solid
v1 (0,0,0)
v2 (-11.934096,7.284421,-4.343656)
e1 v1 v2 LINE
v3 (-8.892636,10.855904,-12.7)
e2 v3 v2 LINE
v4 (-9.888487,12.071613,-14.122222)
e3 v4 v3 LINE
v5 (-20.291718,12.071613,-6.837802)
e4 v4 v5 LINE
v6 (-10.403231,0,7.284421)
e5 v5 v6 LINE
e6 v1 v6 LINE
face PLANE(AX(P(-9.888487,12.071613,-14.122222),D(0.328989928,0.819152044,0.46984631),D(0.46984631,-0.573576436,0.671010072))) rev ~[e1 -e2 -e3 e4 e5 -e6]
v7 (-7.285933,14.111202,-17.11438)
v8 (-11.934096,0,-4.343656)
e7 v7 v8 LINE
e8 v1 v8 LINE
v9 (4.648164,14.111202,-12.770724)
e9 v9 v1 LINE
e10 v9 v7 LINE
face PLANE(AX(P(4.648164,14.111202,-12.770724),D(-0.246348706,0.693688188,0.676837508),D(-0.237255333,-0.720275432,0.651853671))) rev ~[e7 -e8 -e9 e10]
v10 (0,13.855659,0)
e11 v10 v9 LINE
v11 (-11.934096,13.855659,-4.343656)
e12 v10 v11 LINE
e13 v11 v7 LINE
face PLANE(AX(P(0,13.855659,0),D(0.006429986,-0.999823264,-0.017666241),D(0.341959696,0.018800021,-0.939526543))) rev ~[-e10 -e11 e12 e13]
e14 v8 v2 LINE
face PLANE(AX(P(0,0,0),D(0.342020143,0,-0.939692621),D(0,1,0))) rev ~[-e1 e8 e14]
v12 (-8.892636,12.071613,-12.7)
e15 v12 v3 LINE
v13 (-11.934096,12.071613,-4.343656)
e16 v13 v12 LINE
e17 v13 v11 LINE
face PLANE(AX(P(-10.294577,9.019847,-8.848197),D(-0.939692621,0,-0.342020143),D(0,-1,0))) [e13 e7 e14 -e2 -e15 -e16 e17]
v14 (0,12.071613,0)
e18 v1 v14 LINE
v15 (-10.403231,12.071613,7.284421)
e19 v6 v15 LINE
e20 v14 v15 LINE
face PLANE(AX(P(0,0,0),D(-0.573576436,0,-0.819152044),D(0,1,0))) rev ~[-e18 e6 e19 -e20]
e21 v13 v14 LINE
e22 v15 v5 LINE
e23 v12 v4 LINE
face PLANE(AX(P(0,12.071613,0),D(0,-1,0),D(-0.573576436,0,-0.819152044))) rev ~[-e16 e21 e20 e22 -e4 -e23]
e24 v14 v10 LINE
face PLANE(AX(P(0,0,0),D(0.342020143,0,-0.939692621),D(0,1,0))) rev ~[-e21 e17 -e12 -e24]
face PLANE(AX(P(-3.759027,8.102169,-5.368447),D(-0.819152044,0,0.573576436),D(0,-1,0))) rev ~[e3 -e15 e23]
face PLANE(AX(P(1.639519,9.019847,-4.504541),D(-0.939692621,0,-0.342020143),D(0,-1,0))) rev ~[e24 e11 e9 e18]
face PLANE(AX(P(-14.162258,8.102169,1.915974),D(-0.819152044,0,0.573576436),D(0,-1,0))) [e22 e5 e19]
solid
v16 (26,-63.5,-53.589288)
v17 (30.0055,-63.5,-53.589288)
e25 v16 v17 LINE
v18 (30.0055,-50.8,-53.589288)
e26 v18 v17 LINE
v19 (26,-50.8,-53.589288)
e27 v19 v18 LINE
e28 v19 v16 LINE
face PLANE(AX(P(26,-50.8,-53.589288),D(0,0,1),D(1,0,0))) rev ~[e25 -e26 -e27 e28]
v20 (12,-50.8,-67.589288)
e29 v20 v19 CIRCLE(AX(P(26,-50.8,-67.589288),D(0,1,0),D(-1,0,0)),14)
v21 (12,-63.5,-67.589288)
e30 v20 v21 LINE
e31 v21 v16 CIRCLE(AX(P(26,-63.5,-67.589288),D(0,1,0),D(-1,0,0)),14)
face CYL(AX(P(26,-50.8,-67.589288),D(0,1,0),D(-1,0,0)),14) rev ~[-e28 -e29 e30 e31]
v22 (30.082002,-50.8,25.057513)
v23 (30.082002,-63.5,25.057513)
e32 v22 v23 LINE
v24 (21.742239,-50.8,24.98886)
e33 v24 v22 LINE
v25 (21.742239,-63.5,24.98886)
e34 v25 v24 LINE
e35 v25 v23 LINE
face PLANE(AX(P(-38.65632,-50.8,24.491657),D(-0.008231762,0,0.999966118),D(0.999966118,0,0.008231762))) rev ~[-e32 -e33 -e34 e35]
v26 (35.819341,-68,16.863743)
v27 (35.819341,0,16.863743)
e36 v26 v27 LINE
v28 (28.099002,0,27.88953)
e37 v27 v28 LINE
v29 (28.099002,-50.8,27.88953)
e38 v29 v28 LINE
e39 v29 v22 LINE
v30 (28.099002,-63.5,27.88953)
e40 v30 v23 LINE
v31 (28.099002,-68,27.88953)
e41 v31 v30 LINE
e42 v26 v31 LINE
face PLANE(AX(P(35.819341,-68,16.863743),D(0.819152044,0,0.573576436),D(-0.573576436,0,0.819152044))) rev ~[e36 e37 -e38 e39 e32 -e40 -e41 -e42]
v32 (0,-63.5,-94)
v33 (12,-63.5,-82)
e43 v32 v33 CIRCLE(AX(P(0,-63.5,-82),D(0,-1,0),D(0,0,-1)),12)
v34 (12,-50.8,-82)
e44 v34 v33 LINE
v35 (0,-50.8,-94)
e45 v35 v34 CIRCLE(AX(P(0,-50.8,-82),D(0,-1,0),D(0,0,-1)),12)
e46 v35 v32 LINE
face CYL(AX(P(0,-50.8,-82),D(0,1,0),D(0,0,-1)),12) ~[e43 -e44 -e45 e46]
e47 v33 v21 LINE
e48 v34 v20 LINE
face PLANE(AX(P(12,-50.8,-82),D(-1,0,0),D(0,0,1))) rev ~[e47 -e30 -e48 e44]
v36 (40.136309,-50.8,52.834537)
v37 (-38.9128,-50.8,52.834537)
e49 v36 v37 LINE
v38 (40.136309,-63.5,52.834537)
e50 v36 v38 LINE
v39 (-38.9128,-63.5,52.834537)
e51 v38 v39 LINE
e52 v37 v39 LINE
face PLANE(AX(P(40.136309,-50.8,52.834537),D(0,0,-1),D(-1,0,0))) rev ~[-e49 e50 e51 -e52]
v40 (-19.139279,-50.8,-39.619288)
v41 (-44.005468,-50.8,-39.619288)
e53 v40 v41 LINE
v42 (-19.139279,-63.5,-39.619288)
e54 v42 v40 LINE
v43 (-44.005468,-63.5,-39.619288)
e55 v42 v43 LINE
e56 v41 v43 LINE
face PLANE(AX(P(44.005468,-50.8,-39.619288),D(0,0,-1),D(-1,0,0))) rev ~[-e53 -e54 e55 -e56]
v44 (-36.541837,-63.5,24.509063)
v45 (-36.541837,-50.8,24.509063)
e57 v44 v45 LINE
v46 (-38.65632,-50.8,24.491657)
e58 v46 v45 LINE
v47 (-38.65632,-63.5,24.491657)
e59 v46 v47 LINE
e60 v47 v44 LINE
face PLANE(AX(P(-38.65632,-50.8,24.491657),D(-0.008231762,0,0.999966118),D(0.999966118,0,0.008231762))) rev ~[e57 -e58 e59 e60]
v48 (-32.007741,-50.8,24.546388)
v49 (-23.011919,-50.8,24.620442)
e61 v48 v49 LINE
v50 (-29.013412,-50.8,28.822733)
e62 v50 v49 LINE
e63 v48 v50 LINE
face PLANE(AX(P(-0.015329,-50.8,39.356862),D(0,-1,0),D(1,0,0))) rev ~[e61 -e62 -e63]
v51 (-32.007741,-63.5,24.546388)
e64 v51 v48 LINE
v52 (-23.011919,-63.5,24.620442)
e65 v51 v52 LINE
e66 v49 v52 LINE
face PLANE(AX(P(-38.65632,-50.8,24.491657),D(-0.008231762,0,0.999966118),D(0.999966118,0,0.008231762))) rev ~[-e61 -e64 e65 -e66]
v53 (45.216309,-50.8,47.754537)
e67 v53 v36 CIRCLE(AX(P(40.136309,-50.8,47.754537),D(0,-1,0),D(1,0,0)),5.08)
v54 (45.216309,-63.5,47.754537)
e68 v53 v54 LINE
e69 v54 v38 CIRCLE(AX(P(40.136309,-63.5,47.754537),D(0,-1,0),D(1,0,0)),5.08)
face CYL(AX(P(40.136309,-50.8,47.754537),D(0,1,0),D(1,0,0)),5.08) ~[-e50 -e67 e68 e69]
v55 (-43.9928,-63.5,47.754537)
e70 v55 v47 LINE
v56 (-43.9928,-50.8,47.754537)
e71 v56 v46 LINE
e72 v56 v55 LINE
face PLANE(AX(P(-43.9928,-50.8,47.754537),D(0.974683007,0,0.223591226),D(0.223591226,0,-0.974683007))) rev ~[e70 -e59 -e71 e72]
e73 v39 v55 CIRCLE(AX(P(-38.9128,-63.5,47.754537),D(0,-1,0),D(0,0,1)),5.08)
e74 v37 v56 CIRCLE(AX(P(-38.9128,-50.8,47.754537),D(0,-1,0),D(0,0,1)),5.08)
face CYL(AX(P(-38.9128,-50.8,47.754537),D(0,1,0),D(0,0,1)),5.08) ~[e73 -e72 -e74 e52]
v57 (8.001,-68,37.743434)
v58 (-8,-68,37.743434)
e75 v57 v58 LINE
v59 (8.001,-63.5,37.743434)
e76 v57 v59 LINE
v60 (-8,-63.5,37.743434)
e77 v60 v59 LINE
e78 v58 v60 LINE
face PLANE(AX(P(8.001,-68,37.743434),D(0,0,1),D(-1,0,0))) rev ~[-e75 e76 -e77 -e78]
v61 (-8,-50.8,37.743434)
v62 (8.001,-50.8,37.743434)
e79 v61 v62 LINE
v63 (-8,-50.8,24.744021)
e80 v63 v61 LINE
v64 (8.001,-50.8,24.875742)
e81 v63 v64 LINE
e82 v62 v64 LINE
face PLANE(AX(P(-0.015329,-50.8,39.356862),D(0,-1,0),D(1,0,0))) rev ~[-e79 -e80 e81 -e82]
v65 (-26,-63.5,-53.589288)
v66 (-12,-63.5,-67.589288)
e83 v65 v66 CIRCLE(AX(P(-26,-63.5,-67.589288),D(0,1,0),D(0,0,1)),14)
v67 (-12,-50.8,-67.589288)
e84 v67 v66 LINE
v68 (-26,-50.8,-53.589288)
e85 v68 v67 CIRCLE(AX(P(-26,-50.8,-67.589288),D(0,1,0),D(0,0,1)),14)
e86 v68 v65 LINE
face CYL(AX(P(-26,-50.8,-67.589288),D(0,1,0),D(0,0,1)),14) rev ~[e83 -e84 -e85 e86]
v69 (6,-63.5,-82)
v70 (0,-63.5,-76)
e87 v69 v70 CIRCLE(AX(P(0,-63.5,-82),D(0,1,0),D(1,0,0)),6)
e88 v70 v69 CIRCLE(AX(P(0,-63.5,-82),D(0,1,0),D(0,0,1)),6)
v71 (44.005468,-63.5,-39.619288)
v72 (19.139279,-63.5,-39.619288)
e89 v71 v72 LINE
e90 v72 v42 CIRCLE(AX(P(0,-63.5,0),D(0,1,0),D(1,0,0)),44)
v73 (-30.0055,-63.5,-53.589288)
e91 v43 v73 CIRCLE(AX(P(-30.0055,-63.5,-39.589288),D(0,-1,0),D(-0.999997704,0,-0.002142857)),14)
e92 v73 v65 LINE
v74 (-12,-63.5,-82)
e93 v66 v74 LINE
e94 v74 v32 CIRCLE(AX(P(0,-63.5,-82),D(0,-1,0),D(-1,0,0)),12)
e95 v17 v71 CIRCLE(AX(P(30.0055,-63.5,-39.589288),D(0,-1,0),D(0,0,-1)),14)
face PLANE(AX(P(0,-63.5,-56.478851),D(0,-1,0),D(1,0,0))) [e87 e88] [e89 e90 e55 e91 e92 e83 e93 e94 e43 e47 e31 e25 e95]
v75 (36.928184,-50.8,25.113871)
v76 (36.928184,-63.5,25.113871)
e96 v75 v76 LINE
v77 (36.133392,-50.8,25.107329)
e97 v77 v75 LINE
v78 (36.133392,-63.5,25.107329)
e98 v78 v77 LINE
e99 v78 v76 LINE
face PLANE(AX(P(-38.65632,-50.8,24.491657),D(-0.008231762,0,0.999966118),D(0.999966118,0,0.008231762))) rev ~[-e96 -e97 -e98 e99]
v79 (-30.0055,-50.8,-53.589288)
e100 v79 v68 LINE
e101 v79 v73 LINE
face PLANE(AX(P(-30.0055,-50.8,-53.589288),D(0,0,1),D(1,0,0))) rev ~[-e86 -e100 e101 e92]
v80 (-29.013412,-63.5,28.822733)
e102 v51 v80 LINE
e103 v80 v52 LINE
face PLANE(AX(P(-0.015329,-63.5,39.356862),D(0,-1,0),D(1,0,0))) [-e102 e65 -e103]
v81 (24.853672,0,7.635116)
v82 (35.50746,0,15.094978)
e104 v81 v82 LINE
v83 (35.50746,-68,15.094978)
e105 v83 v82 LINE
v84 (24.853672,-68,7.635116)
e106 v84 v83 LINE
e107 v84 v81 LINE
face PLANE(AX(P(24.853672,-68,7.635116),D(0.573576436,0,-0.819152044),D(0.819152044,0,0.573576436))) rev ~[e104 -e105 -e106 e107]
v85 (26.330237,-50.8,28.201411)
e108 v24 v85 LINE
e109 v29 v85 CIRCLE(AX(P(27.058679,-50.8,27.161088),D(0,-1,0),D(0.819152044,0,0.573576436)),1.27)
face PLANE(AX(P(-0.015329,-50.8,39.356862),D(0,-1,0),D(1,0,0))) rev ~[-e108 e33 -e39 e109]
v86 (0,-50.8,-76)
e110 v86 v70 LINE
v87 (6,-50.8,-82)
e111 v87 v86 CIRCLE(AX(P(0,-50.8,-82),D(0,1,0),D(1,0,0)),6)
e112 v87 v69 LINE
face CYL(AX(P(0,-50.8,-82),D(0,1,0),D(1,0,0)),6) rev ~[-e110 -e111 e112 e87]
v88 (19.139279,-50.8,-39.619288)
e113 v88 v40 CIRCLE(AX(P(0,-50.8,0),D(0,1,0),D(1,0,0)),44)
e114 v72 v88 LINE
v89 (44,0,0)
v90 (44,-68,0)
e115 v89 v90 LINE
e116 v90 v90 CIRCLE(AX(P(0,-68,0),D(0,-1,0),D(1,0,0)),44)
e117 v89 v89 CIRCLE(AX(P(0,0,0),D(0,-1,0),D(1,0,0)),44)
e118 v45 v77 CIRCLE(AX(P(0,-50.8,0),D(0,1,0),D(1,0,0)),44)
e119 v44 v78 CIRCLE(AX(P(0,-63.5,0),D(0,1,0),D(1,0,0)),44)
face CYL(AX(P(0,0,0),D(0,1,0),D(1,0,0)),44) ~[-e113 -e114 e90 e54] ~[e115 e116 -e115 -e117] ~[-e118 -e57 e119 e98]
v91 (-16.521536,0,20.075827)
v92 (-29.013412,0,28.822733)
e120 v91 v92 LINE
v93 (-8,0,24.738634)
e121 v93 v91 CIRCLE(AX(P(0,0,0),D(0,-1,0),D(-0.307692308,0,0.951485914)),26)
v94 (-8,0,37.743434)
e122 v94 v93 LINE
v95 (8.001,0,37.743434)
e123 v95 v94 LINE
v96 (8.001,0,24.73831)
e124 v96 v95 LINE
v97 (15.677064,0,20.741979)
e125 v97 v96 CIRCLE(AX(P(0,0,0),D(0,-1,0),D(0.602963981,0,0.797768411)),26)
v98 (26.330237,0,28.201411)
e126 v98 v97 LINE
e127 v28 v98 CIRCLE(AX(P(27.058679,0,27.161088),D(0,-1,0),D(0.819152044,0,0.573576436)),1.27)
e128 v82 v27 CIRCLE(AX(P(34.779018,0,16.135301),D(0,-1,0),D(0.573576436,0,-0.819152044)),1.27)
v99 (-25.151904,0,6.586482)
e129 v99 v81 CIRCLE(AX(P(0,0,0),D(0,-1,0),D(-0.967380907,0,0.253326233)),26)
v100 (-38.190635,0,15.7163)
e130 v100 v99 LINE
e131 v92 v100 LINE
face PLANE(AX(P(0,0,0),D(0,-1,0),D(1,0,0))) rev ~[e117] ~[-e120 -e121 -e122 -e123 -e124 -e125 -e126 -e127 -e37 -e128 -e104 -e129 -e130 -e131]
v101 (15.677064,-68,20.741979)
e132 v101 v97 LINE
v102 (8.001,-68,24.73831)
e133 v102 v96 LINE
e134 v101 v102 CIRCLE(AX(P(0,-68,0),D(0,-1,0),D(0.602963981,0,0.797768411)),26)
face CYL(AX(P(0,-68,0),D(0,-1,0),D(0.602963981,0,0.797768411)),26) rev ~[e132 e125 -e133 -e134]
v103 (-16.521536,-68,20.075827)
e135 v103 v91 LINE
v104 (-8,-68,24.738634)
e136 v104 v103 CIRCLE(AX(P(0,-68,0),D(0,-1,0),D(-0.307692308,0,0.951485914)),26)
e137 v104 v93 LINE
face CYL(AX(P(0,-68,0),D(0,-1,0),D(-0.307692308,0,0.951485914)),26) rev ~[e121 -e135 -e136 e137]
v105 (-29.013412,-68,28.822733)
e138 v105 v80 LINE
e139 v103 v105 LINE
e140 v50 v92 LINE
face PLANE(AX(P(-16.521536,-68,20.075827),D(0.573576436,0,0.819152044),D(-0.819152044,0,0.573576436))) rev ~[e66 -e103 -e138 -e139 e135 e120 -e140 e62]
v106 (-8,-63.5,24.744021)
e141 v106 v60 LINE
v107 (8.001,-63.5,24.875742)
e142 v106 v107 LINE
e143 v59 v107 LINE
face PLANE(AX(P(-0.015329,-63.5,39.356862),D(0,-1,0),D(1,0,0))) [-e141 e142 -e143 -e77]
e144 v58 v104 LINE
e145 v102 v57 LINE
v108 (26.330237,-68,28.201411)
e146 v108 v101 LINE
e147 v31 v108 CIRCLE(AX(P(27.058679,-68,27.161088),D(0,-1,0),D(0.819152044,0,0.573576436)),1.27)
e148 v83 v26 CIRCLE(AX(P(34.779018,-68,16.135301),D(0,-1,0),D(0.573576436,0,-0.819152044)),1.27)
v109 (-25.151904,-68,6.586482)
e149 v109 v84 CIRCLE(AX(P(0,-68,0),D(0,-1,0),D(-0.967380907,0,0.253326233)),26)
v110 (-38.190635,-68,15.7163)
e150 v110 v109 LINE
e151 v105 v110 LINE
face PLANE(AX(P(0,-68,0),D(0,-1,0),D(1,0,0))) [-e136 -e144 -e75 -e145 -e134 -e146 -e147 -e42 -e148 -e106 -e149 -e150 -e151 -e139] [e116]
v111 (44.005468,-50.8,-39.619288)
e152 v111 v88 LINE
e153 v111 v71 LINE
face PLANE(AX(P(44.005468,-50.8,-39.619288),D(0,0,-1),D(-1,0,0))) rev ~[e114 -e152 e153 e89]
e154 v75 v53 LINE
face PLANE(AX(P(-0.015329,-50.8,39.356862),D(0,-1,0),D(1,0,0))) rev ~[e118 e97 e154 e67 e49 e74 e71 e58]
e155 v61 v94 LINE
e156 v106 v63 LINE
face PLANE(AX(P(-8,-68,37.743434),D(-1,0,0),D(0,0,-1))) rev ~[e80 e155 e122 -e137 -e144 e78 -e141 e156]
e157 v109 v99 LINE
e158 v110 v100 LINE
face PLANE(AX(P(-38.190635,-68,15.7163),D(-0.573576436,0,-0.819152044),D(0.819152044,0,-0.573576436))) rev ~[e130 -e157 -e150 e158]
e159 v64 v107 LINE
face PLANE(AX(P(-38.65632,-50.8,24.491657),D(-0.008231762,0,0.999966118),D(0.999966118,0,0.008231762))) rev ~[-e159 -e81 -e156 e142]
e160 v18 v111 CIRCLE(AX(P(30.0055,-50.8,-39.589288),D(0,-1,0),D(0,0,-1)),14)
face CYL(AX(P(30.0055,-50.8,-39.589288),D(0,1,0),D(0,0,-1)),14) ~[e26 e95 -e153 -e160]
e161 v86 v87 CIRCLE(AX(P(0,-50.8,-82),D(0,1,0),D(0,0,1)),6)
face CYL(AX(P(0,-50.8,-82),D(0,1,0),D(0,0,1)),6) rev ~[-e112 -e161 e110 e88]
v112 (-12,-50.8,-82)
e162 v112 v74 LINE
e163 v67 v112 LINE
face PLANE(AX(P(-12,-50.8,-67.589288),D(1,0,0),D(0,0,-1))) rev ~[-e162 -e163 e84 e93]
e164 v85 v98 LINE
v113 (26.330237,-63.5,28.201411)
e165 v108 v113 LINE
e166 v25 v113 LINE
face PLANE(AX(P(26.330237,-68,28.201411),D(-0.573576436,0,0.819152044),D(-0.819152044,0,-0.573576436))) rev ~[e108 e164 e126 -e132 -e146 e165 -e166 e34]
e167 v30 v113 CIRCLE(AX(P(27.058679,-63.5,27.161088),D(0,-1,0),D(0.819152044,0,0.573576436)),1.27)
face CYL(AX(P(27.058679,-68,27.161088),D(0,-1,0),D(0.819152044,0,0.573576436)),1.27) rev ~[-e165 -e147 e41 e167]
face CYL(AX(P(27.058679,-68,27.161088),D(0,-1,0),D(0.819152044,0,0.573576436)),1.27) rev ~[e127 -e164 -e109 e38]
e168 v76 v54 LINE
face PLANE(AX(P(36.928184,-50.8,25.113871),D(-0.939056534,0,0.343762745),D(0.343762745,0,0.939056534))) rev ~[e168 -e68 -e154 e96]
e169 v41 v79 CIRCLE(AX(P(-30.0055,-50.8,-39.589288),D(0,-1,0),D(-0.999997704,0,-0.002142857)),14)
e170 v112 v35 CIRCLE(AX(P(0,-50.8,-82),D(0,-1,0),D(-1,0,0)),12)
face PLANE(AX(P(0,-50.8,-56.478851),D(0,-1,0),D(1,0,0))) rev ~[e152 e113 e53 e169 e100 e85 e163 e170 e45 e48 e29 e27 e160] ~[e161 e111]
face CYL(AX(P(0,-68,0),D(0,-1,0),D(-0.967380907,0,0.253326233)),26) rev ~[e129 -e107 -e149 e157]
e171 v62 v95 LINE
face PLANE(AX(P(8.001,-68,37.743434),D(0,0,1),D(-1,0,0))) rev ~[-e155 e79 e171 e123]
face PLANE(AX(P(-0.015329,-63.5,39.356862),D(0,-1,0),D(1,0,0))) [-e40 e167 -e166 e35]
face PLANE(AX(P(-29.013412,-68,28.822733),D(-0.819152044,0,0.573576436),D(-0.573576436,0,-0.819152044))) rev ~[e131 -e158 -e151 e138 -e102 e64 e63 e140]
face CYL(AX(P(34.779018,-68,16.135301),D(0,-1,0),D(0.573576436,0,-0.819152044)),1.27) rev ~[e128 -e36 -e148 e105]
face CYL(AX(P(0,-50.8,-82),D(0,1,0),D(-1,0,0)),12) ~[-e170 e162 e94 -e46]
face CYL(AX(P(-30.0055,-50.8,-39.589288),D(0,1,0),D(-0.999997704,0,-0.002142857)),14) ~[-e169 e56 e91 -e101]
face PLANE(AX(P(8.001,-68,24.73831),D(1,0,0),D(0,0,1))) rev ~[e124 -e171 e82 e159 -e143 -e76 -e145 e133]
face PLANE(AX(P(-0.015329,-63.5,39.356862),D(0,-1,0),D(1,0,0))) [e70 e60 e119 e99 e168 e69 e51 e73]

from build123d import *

# Parameters (mm, degrees)
F0_R      = 44
F1_DEPTH  = 68
F7_DEPTH  = 68.001
F10_DEPTH = 12.7
F13_DEPTH = 12.7
F14_DEPTH = 12.7
F17_DEPTH = 12.7


# Not quite as in the source:
# - a feature names something its author has since deleted; it is built from what else it names


with BuildPart() as f1:
    # F0 (on Front) → F1 (new body)
    with BuildSketch(Plane.XZ):
        Circle(F0_R)
    extrude(amount=F1_DEPTH)

    # F3 (on offset) → F7 (cut, through all)
    with BuildSketch(Plane.XZ.offset(68)):
        with BuildLine():
            Line((26.3302369395, 28.2014110136), (15.6770635175, 20.7419786777))
            ThreePointArc((15.6770635175, 20.7419786777), (12.0064707427, 23.0617575285), (8.001, 24.7383103505))
            ThreePointArc((8.001, 24.7383103505), (0.0005254973, 25.9999999947), (-8, 24.7386337537))
            ThreePointArc((-8, 24.7386337537), (-12.480459792, 22.8087291049), (-16.5215362846, 20.0758272257))
            Line((-16.5215362846, 20.0758272257), (-29.0134122429, 28.8227329381))
            Line((-29.0134122429, 28.8227329381), (-38.1906352245, 15.7163002295))
            Line((-38.1906352245, 15.7163002295), (-25.15190359, 6.5864820503))
            ThreePointArc((-25.15190359, 6.5864820503), (0.5451088298, -25.9942850712), (24.8536719418, 7.6351156514))
            Line((24.8536719418, 7.6351156514), (35.5074599211, 15.094978305))
            ThreePointArc((35.5074599211, 15.094978305), (36.0297236932, 15.9147682156), (35.8193409432, 16.8637434754))
            Line((35.8193409432, 16.8637434754), (28.0990021099, 27.8895299915))
            ThreePointArc((28.0990021099, 27.8895299915), (27.2792121993, 28.4117937637), (26.3302369395, 28.2014110136))
        make_face()
        with BuildLine():
            ThreePointArc((-8, 24.7386337537), (0.0005254973, 25.9999999947), (8.001, 24.7383103505))
            Line((8.001, 24.7383103505), (8.001, 37.7434337537))
            Line((8.001, 37.7434337537), (0, 37.7434337537))
            Line((0, 37.7434337537), (-8, 37.7434337537))
            Line((-8, 37.7434337537), (-8, 24.7386337537))
        make_face()
    extrude(amount=-F7_DEPTH, mode=Mode.SUBTRACT)

    # F6 (on offset) → F14 (join)
    with BuildSketch(Plane.XZ.offset(50.8)):
        with BuildLine():
            Line((44.0054678571, -39.6192881453), (0, -39.6192881453))
            Line((0, -39.6192881453), (-44.0054678571, -39.6192881453))
            ThreePointArc((-44.0054678571, -39.6192881453), (-39.8943826467, -49.4993840076), (-30.0055, -53.5892881453))
            Line((-30.0055, -53.5892881453), (-26, -53.5892881453))
            ThreePointArc((-26, -53.5892881453), (-16.1005050634, -57.6897932087), (-12, -67.5892881453))
            Line((-12, -67.5892881453), (-12, -82))
            ThreePointArc((-12, -82), (-8.4852813742, -90.4852813742), (0, -94))
            ThreePointArc((0, -94), (8.4852813742, -90.4852813742), (12, -82))
            Line((12, -82), (12, -67.5892881453))
            ThreePointArc((12, -67.5892881453), (16.1005050634, -57.6897932087), (26, -53.5892881453))
            Line((26, -53.5892881453), (30.0055, -53.5892881453))
            ThreePointArc((30.0055, -53.5892881453), (39.8943826467, -49.4993840076), (44.0054678571, -39.6192881453))
        make_face()
        with BuildLine():
            ThreePointArc((6, -82), (-4.2426406871, -86.2426406871), (0, -76))
            ThreePointArc((0, -76), (4.2426406871, -77.7573593129), (6, -82))
        make_face(mode=Mode.SUBTRACT)
    extrude(amount=F14_DEPTH)

    # F16 (on offset) → F17 (join)
    with BuildSketch(Plane.XZ.offset(50.8)):
        with BuildLine():
            ThreePointArc((45.2163087713, 47.7545370714), (43.7284112197, 51.3466395198), (40.1363087713, 52.8345370714))
            Line((40.1363087713, 52.8345370714), (-38.9128, 52.8345370714))
            ThreePointArc((-38.9128, 52.8345370714), (-42.5049024484, 51.3466395198), (-43.9928, 47.7545370714))
            Line((-43.9928, 47.7545370714), (-38.6563204229, 24.4916565716))
            Line((-38.6563204229, 24.4916565716), (36.9281843305, 25.1138713211))
            Line((36.9281843305, 25.1138713211), (45.2163087713, 47.7545370714))
        make_face()
    extrude(amount=F17_DEPTH)


with BuildPart() as f10:
    # F9 (on face) → F10 (new body)
    with BuildSketch(Plane(origin=(0, 0, 0), x_dir=(0, -1, 0), z_dir=(-0.8191520443, 0, 0.5735764364))):
        Polygon((-12.0716131376, -17.2400502406), (0, 0), (-12.0716131376, 0), align=None)
    extrude(amount=F10_DEPTH)

    # F12 (on face) → F13 (join)
    with BuildSketch(Plane(origin=(0, 0, 0), x_dir=(0, -1, 0), z_dir=(-0.9396926208, 0, -0.3420201433))):
        Polygon((0, 0), (-13.8556587323, 0), (-14.1112022102, -13.5903209448), align=None)
    extrude(amount=F13_DEPTH)


solid = Compound([f1.part, f10.part])
